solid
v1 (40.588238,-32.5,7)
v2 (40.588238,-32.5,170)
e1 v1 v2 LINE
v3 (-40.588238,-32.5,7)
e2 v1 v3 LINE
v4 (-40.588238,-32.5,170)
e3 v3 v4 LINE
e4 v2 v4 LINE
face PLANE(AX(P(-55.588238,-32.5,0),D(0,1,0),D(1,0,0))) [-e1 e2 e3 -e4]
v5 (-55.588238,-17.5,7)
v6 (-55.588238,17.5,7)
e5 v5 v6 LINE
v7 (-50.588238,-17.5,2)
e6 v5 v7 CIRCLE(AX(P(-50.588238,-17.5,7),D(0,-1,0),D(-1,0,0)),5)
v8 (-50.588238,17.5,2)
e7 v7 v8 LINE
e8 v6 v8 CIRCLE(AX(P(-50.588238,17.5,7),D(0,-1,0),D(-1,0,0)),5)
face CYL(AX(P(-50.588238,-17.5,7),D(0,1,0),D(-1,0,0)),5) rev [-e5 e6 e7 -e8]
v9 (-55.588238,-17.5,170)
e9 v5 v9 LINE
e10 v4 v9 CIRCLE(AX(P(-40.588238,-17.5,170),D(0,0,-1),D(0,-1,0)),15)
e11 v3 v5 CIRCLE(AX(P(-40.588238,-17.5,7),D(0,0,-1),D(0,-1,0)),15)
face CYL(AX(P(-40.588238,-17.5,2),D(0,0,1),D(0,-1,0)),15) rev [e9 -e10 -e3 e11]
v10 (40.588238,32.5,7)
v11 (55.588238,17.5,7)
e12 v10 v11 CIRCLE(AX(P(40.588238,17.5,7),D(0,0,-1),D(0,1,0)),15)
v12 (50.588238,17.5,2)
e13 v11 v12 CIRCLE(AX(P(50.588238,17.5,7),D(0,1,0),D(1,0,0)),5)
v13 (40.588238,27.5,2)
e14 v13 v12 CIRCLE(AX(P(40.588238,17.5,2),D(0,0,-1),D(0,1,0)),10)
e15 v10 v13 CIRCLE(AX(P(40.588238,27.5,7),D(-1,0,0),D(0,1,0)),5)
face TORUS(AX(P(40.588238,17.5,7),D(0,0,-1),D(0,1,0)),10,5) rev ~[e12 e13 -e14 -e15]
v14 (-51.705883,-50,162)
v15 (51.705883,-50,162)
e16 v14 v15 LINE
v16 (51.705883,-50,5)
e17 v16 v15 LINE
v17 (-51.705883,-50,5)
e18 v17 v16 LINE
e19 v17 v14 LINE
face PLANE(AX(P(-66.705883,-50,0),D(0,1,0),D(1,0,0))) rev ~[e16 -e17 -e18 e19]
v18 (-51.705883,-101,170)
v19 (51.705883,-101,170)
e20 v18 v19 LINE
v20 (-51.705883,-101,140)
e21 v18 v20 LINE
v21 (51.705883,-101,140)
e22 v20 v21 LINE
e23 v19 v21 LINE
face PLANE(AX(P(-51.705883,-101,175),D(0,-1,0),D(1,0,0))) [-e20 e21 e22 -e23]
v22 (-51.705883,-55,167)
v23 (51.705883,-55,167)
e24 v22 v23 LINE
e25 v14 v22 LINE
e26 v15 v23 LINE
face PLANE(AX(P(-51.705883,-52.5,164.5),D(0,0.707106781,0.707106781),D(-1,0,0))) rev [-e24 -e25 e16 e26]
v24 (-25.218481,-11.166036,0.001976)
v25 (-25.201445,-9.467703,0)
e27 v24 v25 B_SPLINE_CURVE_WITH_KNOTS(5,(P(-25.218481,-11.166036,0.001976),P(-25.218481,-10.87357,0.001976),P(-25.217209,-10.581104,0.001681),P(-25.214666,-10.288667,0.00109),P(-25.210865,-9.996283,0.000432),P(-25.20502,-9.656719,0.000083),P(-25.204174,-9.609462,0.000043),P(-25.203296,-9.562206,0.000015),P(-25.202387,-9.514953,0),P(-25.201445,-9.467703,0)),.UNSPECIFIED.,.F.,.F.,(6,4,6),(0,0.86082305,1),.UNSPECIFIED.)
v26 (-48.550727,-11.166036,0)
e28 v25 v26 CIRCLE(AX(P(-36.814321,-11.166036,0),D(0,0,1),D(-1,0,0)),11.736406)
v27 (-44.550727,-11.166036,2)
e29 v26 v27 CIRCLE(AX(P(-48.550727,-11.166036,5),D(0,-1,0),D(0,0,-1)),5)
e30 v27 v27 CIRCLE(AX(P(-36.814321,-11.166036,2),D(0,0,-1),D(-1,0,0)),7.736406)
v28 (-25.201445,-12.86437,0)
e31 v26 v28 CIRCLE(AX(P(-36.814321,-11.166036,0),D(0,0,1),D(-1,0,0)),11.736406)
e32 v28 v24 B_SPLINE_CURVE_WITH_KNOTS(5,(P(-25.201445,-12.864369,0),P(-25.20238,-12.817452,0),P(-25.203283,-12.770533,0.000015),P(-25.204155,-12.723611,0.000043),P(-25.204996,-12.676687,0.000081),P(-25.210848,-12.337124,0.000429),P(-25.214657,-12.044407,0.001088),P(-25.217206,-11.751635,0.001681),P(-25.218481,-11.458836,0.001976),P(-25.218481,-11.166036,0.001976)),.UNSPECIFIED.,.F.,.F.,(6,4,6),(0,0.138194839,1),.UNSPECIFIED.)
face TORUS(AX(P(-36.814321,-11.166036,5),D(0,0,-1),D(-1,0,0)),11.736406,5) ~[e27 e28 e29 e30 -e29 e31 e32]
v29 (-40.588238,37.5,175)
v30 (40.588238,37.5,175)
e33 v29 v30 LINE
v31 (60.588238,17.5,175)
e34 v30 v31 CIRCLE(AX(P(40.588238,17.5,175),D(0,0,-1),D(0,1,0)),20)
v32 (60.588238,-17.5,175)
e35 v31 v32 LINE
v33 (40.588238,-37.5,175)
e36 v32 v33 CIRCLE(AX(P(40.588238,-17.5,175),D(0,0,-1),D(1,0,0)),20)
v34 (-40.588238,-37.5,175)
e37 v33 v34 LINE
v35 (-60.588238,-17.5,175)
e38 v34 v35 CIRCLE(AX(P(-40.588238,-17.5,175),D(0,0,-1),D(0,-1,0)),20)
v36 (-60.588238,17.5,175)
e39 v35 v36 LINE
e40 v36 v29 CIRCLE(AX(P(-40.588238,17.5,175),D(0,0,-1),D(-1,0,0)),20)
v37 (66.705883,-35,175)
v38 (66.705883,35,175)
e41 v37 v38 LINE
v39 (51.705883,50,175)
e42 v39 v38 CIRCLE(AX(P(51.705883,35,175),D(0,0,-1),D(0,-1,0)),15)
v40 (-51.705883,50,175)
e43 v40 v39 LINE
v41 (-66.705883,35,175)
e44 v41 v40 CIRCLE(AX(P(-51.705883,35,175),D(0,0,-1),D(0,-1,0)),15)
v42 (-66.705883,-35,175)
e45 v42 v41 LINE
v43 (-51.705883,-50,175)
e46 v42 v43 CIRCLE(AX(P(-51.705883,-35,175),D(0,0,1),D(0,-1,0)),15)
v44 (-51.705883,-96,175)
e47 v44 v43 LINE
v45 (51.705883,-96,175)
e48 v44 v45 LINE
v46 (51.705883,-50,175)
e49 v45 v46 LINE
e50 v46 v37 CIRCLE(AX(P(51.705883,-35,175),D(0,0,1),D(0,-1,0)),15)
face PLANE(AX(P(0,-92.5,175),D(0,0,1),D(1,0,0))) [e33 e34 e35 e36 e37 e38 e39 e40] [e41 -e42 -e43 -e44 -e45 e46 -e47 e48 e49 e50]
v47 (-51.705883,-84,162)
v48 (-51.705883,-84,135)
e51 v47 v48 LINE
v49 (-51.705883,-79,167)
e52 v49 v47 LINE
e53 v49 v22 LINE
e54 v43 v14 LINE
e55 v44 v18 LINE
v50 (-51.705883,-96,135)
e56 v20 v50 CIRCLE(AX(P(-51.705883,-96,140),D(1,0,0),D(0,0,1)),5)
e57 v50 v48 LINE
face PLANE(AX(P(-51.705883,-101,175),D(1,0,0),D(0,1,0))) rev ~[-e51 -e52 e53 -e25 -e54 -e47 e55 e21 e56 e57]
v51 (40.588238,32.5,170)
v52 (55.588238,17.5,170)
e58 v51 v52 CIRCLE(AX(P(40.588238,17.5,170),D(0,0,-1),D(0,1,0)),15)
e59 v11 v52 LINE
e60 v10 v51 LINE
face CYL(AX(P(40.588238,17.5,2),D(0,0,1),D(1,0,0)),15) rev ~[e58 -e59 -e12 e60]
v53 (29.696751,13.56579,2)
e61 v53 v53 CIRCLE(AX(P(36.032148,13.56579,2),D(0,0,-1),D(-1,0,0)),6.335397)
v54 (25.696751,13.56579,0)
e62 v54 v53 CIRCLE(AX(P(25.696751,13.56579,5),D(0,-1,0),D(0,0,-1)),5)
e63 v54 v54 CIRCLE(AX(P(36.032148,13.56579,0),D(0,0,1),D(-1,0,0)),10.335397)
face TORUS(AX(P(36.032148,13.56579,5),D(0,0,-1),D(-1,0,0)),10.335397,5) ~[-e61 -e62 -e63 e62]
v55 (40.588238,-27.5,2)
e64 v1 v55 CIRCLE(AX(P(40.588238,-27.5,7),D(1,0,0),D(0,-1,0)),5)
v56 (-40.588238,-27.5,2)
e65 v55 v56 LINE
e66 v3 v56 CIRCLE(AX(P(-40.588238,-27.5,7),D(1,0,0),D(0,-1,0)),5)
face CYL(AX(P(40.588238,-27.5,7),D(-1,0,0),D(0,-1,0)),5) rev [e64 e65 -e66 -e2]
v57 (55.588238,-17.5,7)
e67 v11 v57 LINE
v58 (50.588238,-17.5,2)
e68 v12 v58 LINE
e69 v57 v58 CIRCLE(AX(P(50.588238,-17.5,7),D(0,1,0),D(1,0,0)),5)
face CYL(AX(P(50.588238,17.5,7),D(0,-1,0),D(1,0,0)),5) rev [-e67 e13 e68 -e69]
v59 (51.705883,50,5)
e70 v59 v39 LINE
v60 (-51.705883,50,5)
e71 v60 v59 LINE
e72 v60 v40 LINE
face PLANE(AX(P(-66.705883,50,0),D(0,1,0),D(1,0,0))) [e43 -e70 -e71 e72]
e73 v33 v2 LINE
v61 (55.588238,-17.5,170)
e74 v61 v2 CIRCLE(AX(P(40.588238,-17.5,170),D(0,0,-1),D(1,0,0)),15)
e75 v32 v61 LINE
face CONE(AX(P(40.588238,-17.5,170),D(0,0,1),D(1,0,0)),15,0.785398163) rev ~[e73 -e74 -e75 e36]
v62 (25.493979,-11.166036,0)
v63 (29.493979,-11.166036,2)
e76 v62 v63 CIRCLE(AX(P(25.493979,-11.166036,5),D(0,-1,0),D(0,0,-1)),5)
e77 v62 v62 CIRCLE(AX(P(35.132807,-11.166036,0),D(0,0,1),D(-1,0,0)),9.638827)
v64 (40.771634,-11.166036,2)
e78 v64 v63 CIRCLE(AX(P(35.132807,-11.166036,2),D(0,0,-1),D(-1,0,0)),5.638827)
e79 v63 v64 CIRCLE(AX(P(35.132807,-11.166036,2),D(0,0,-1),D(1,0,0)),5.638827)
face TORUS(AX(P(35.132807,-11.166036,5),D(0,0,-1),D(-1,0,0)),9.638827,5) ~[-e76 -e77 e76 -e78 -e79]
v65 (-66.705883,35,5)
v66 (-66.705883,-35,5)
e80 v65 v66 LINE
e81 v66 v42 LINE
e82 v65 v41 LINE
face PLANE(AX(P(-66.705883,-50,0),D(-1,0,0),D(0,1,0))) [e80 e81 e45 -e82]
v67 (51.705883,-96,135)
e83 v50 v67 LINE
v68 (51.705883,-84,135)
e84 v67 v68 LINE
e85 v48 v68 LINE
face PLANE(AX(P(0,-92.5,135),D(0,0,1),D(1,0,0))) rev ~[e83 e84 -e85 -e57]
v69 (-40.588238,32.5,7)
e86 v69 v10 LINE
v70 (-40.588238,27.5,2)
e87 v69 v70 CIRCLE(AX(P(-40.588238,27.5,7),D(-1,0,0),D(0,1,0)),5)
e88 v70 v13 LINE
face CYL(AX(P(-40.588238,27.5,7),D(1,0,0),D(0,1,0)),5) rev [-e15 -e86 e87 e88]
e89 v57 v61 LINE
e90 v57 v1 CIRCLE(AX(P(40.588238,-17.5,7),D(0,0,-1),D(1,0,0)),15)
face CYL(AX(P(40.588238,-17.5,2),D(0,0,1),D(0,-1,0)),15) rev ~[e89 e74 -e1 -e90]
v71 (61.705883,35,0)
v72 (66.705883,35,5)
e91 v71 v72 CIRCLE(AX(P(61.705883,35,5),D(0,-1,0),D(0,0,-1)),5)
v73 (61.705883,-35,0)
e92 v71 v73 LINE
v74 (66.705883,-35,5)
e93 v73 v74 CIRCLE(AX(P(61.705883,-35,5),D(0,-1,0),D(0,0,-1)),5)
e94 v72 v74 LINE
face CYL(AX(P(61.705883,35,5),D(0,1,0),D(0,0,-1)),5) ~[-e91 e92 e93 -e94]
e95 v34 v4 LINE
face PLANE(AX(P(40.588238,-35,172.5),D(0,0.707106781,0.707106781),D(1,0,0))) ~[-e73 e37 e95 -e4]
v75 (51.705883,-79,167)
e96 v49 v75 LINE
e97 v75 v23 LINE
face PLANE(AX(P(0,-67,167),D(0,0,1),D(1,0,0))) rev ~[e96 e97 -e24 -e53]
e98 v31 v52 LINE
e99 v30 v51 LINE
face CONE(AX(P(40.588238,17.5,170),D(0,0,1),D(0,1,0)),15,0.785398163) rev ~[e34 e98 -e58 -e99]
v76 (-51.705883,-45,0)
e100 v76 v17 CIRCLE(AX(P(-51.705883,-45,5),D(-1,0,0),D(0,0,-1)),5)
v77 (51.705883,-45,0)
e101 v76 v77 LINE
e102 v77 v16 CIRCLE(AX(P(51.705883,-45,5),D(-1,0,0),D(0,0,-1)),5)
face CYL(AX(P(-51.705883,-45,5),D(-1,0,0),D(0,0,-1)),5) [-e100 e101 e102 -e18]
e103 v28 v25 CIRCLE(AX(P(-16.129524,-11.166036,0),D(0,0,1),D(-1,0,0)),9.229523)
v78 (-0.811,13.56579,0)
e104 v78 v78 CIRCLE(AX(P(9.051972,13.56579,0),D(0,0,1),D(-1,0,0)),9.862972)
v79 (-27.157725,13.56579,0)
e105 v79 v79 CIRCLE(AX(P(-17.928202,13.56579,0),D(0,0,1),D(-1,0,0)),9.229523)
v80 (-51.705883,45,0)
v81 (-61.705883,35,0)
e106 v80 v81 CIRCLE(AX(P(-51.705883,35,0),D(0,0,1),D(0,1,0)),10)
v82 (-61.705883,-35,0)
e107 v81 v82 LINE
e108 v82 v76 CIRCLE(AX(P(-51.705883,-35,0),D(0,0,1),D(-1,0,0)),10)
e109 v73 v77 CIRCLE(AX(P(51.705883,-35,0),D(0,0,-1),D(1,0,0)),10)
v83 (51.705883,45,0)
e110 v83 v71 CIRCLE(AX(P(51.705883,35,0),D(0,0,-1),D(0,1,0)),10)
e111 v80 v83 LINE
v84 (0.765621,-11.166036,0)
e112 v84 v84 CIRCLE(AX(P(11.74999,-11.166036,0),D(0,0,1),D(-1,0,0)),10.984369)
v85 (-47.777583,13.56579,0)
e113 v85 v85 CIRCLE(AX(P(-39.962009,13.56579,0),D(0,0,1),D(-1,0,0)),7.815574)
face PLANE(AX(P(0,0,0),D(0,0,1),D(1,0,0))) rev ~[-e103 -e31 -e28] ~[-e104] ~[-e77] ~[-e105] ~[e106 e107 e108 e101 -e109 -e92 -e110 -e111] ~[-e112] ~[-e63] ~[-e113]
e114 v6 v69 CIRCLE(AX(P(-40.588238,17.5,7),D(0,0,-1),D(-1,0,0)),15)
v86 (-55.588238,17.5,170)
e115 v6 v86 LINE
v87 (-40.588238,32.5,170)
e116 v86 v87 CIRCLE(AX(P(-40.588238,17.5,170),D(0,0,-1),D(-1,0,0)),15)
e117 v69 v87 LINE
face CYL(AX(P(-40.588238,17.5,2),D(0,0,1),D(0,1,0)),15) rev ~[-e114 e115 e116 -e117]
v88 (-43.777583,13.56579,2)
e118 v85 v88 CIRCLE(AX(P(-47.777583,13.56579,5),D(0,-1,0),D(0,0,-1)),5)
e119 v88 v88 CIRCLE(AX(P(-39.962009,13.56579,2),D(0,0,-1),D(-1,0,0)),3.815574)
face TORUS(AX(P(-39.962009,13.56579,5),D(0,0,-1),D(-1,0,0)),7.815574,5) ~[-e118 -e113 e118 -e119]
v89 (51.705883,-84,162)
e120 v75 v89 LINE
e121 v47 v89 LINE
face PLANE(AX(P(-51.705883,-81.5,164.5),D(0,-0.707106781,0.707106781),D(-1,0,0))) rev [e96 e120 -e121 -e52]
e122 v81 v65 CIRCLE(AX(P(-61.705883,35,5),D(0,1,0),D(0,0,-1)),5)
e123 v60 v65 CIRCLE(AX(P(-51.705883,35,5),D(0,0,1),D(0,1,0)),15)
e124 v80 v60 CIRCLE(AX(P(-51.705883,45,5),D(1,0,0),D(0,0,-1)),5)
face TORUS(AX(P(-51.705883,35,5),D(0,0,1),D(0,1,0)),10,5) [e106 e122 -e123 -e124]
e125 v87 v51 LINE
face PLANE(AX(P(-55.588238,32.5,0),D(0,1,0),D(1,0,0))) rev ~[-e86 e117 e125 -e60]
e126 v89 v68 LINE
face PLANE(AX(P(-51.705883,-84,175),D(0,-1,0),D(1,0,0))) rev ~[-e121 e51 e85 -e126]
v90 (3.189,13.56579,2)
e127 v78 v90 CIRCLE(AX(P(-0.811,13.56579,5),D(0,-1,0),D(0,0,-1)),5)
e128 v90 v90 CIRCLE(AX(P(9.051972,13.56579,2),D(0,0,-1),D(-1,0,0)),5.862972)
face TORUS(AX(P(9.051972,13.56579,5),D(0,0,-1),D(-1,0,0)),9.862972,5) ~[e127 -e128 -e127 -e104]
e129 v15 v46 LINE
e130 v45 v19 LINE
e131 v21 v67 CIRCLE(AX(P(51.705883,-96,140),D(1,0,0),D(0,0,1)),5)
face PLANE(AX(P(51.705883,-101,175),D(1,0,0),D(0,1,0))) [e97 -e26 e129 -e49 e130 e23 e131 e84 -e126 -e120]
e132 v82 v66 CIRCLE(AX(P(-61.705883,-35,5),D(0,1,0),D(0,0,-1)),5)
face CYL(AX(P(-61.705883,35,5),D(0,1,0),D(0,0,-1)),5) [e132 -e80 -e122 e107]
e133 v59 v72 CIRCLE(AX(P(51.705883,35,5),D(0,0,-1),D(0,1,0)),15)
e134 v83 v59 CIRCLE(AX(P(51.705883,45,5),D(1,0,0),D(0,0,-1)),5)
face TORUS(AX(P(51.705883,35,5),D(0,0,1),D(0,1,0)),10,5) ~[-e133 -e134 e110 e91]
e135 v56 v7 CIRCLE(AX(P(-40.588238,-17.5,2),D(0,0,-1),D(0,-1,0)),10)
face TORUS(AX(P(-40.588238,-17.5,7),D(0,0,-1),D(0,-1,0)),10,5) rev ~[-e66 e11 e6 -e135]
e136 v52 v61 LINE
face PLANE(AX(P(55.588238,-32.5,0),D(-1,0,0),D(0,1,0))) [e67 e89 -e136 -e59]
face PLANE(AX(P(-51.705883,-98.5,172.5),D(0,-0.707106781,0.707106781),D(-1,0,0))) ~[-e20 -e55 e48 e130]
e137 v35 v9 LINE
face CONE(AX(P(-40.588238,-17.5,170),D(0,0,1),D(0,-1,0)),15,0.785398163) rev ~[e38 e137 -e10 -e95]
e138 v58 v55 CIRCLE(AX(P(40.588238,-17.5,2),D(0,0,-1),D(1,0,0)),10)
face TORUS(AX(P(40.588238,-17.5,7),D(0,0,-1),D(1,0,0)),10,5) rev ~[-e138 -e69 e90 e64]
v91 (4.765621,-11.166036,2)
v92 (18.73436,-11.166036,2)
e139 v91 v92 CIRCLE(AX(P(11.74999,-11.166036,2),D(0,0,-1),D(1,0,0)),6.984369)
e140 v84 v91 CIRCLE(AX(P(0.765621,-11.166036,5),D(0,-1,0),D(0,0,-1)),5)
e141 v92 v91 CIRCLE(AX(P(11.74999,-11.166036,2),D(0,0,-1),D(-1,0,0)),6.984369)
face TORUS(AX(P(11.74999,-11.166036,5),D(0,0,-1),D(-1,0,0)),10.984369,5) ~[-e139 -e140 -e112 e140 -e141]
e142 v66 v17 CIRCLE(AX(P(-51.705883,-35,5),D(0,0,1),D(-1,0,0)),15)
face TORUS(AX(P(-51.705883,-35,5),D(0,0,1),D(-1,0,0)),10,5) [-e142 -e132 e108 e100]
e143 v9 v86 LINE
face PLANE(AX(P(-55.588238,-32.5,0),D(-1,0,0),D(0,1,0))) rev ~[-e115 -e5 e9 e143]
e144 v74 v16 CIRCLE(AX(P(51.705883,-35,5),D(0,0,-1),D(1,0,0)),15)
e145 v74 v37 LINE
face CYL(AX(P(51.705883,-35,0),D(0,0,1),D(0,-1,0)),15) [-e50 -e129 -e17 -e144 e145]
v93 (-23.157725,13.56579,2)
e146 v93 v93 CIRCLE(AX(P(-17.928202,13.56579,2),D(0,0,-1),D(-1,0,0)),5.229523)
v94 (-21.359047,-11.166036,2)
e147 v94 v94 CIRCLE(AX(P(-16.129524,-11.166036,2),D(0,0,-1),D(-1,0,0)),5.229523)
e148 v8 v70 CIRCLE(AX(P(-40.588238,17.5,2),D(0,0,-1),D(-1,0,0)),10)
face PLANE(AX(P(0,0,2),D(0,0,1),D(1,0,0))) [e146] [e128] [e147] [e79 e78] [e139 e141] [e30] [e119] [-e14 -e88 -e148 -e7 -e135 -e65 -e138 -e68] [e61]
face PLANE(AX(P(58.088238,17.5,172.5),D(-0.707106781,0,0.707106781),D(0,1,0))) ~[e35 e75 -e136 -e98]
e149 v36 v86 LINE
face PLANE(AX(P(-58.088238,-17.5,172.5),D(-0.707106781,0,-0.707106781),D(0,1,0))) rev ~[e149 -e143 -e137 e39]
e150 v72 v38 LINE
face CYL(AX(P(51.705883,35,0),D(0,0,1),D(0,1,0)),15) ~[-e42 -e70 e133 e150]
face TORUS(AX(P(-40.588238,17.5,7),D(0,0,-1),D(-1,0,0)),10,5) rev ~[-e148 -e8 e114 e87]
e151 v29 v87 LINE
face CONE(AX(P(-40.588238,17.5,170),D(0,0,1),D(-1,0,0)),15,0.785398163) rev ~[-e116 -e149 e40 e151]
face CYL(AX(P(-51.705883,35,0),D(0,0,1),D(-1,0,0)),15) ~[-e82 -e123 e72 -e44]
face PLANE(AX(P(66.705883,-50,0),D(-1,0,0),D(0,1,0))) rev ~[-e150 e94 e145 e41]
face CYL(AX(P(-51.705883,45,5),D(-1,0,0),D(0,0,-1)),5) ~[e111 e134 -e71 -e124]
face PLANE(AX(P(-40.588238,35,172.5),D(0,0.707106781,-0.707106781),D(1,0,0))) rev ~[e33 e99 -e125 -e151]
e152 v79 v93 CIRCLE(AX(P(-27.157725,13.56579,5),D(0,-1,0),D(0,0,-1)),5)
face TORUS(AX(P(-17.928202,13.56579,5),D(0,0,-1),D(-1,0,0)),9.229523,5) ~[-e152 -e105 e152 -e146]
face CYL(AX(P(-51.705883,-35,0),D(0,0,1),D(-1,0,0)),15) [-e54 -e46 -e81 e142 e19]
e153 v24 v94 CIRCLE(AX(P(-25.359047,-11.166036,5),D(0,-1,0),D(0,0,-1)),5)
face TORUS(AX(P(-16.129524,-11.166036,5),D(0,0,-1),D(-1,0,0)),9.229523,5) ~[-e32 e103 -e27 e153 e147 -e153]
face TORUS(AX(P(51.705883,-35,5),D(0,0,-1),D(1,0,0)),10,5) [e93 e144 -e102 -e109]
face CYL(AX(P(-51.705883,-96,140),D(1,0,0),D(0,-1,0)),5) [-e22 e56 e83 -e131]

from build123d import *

# Parameters (mm, degrees)
F0_W          = 133.4117650986
F0_H          = 100
F0_W_2        = 111.1764758825
F0_H_2        = 65
F1_DEPTH      = 175
F2_DEPTH      = 2
F3_R          = 15
F4_W          = 103.4117650986
F4_H          = 34
F5_DEPTH      = 8
F4_H_2        = 17
F6_DEPTH      = 40
F7_SIZE       = 5
F8_SIZE       = 5
F9_R          = 5
F10_R         = 5
F12_DEPTH     = 25
F13_T1_DEPTH  = 103.4117650986
F13_T3_DEPTH  = 70
F13_T6_ANGLE  = 90
F13_T8_ANGLE  = 90
F13_T10_ANGLE = 90
F13_T12_ANGLE = 90


# Not quite as in the source:
# - a fillet or chamfer that OpenCascade refuses, or shapes differently, is made with other operations: its cross-section is extruded or revolved along the edge and cut away or added


with BuildPart() as f1:
    # F0 (on Top) → F1 (new body)
    with BuildSketch(Plane.XY):
        Rectangle(F0_W, F0_H)
        Rectangle(F0_W_2, F0_H_2, mode=Mode.SUBTRACT)
    extrude(amount=F1_DEPTH)

    # F0 (on Top) → F2 (join)
    with BuildSketch(Plane.XY):
        Rectangle(F0_W_2, F0_H_2)
    extrude(amount=F2_DEPTH)

    # F3
    f3_edges = [f1.edges().sort_by_distance(p)[0] for p in [
        (66.705883, -50, 87.5),
        (66.705883, 50, 87.5),
        (-66.705883, -50, 87.5),
        (-66.705883, 50, 87.5),
        (55.588238, -32.5, 88.5),
        (-55.588238, -32.5, 88.5),
        (-55.588238, 32.5, 88.5),
        (55.588238, 32.5, 88.5),
    ]]
    fillet(f3_edges, radius=F3_R)

    # F4 (on face) → F5 (join)
    with BuildSketch(Plane.XY.offset(175)):
        with Locations((0, -67)):
            Rectangle(F4_W, F4_H)
    extrude(amount=-F5_DEPTH)

    # F4 (on face) → F6 (join)
    with BuildSketch(Plane.XY.offset(175)):
        with Locations((0, -92.5)):
            Rectangle(F4_W, F4_H_2)
    extrude(amount=-F6_DEPTH)

    # F7
    f7_edges = [f1.edges().sort_by_distance(p)[0] for p in [
        (0, -101, 175),
        (0, -84, 167),
        (0, -50, 167),
    ]]
    chamfer(f7_edges, length=F7_SIZE)

    # F8
    f8_edges = [f1.edges().sort_by_distance(p)[0] for p in [
        (-51.19484, -28.106602, 175),
        (-55.588238, 0, 175),
        (-51.19484, 28.106602, 175),
        (0, 32.5, 175),
        (51.19484, 28.106602, 175),
        (55.588238, 0, 175),
        (51.19484, -28.106602, 175),
        (0, -32.5, 175),
    ]]
    chamfer(f8_edges, length=F8_SIZE)

    # F9
    f9_edges = [f1.edges().sort_by_distance(p)[0] for p in [
        (0, 32.5, 2),
        (51.19484, 28.106602, 2),
        (-51.19484, 28.106602, 2),
        (55.588238, 0, 2),
        (-55.588238, 0, 2),
        (51.19484, -28.106602, 2),
        (-51.19484, -28.106602, 2),
        (0, -32.5, 2),
    ]]
    fillet(f9_edges, radius=F9_R)

    # F10
    f10_edges = [f1.edges().sort_by_distance(p)[0] for p in [
        (0, -101, 135),
    ]]
    fillet(f10_edges, radius=F10_R)

    # F11 (on Top) → F12 (cut)
    with BuildSketch(Plane.XY):
        with BuildLine():
            Line((4.7656208593, -11.166036129), (18.7343597096, -11.166036129))
            ThreePointArc((18.7343597096, -11.166036129), (11.7499902844, -4.1816667038), (4.7656208593, -11.166036129))
        make_face()
        with BuildLine():
            ThreePointArc((4.7656208593, -11.166036129), (11.7499902844, -18.1504055542), (18.7343597096, -11.166036129))
            Line((18.7343597096, -11.166036129), (4.7656208593, -11.166036129))
        make_face()
        with BuildLine():
            ThreePointArc((14.9149444799, 13.5657899082), (9.0519720688, 19.4287623192), (3.1889996578, 13.5657899082))
            Line((3.1889996578, 13.5657899082), (14.9149444799, 13.5657899082))
        make_face()
        with BuildLine():
            Line((14.9149444799, 13.5657899082), (3.1889996578, 13.5657899082))
            ThreePointArc((3.1889996578, 13.5657899082), (9.0519720688, 7.7028174971), (14.9149444799, 13.5657899082))
        make_face()
        with BuildLine():
            ThreePointArc((42.3675444587, 13.5657899082), (36.0321477056, 19.9011866613), (29.6967509524, 13.5657899082))
            Line((29.6967509524, 13.5657899082), (42.3675444587, 13.5657899082))
        make_face()
        with BuildLine():
            Line((42.3675444587, 13.5657899082), (29.6967509524, 13.5657899082))
            ThreePointArc((29.6967509524, 13.5657899082), (36.0321477056, 7.230393155), (42.3675444587, 13.5657899082))
        make_face()
        with BuildLine():
            Line((29.4939792554, -11.166036129), (40.7716342409, -11.166036129))
            ThreePointArc((40.7716342409, -11.166036129), (35.1328067482, -5.5272086363), (29.4939792554, -11.166036129))
        make_face()
        with BuildLine():
            ThreePointArc((29.4939792554, -11.166036129), (35.1328067482, -16.8048636217), (40.7716342409, -11.166036129))
            Line((40.7716342409, -11.166036129), (29.4939792554, -11.166036129))
        make_face()
        with BuildLine():
            Line((-44.5507267353, -11.166036129), (-29.0779149297, -11.166036129))
            ThreePointArc((-29.0779149297, -11.166036129), (-36.8143208325, -3.4296302262), (-44.5507267353, -11.166036129))
        make_face()
        with BuildLine():
            ThreePointArc((-44.5507267353, -11.166036129), (-36.8143208325, -18.9024420318), (-29.0779149297, -11.166036129))
            Line((-29.0779149297, -11.166036129), (-44.5507267353, -11.166036129))
        make_face()
        with BuildLine():
            Line((-21.3590465179, -11.166036129), (-10.9000005135, -11.166036129))
            ThreePointArc((-10.9000005135, -11.166036129), (-16.1295235157, -5.9365131268), (-21.3590465179, -11.166036129))
        make_face()
        with BuildLine():
            ThreePointArc((-21.3590465179, -11.166036129), (-16.1295235157, -16.3955591312), (-10.9000005135, -11.166036129))
            Line((-10.9000005135, -11.166036129), (-21.3590465179, -11.166036129))
        make_face()
        with BuildLine():
            ThreePointArc((-12.6986786843, 13.5657899082), (-17.9282017052, 18.7953129291), (-23.1577247262, 13.5657899082))
            Line((-23.1577247262, 13.5657899082), (-12.6986786843, 13.5657899082))
        make_face()
        with BuildLine():
            Line((-12.6986786843, 13.5657899082), (-23.1577247262, 13.5657899082))
            ThreePointArc((-23.1577247262, 13.5657899082), (-17.9282017052, 8.3362668872), (-12.6986786843, 13.5657899082))
        make_face()
        with BuildLine():
            Line((-43.7775825475, 13.5657899082), (-36.1464346434, 13.5657899082))
            ThreePointArc((-36.1464346434, 13.5657899082), (-39.9620085955, 17.3813638602), (-43.7775825475, 13.5657899082))
        make_face()
        with BuildLine():
            ThreePointArc((-43.7775825475, 13.5657899082), (-39.9620085955, 9.7502159561), (-36.1464346434, 13.5657899082))
            Line((-36.1464346434, 13.5657899082), (-43.7775825475, 13.5657899082))
        make_face()
    extrude(amount=F12_DEPTH, mode=Mode.SUBTRACT)

    # F13: fillet of radius 5 on 16 edges, made by hand

    # F13_s2 → F13_t1 (cut)
    with BuildSketch(Plane.YZ.offset(-51.7058825493)):
        with BuildLine():
            ThreePointArc((45, 0), (48.5355339059, 1.4644660941), (50, 5))
            Line((50, 5), (50, 0))
            Line((50, 0), (45, 0))
        make_face()
        with BuildLine():
            ThreePointArc((-45, 0), (-48.5355339059, 1.4644660941), (-50, 5))
            Line((-50, 5), (-50, 0))
            Line((-50, 0), (-45, 0))
        make_face()
    extrude(amount=F13_T1_DEPTH, mode=Mode.SUBTRACT)

    # F13_s4 → F13_t3 (cut)
    with BuildSketch(Plane.XZ.offset(-35)):
        with BuildLine():
            ThreePointArc((61.7058825493, 0), (65.2414164552, 1.4644660941), (66.7058825493, 5))
            Line((66.7058825493, 5), (66.7058825493, 0))
            Line((66.7058825493, 0), (61.7058825493, 0))
        make_face()
        with BuildLine():
            ThreePointArc((-61.7058825493, 0), (-65.2414164552, 1.4644660941), (-66.7058825493, 5))
            Line((-66.7058825493, 5), (-66.7058825493, 0))
            Line((-66.7058825493, 0), (-61.7058825493, 0))
        make_face()
    extrude(amount=F13_T3_DEPTH, mode=Mode.SUBTRACT)

    # F13_s5 → F13_t6 (revolve, cut)
    with BuildSketch(Plane.YZ.offset(51.7058825493)):
        with BuildLine():
            ThreePointArc((45, 0), (48.5355339059, 1.4644660941), (50, 5))
            Line((50, 5), (50, 0))
            Line((50, 0), (45, 0))
        make_face()
    revolve(axis=Axis((51.7058825493, 35, 0), (0, 0, -1)), revolution_arc=F13_T6_ANGLE, mode=Mode.SUBTRACT)

    # F13_s7 → F13_t8 (revolve, cut)
    with BuildSketch(Plane.YZ.offset(-51.7058825493)):
        with BuildLine():
            ThreePointArc((45, 0), (48.5355339059, 1.4644660941), (50, 5))
            Line((50, 5), (50, 0))
            Line((50, 0), (45, 0))
        make_face()
    revolve(axis=Axis((-51.7058825493, 35, 0), (0, 0, 1)), revolution_arc=F13_T8_ANGLE, mode=Mode.SUBTRACT)

    # F13_s9 → F13_t10 (revolve, cut)
    with BuildSketch(Plane.XZ.offset(35)):
        with BuildLine():
            ThreePointArc((66.7058825493, 5), (65.2414164552, 1.4644660941), (61.7058825493, 0))
            Line((61.7058825493, 0), (66.7058825493, 0))
            Line((66.7058825493, 0), (66.7058825493, 5))
        make_face()
    revolve(axis=Axis((51.7058825493, -35, 0), (0, 0, -1)), revolution_arc=F13_T10_ANGLE, mode=Mode.SUBTRACT)

    # F13_s11 → F13_t12 (revolve, cut)
    with BuildSketch(Plane.XZ.offset(35)):
        with BuildLine():
            ThreePointArc((-61.7058825493, 0), (-65.2414164552, 1.4644660941), (-66.7058825493, 5))
            Line((-66.7058825493, 5), (-66.7058825493, 0))
            Line((-66.7058825493, 0), (-61.7058825493, 0))
        make_face()
    revolve(axis=Axis((-51.7058825493, -35, 0), (0, 0, 1)), revolution_arc=F13_T12_ANGLE, mode=Mode.SUBTRACT)

    # F13_s13 → F13_t14 (revolve, cut)
    with BuildSketch(Plane.XZ.offset(11.166036129)):
        with BuildLine():
            ThreePointArc((-48.5507267353, 0), (-46.3146587578, 0.527864045), (-44.5507267353, 2))
            Line((-44.5507267353, 2), (-44.5507267353, 0))
            Line((-44.5507267353, 0), (-48.5507267353, 0))
        make_face()
    revolve(axis=Axis((-36.8143208325, -11.166036129, 0), (0, 0, 1)), mode=Mode.SUBTRACT)

    # F13_s15 → F13_t16 (revolve, cut)
    with BuildSketch(Plane.XZ.offset(11.166036129)):
        with BuildLine():
            ThreePointArc((-25.3590465179, 0), (-23.1229785404, 0.527864045), (-21.3590465179, 2))
            Line((-21.3590465179, 2), (-21.3590465179, 0))
            Line((-21.3590465179, 0), (-25.3590465179, 0))
        make_face()
    revolve(axis=Axis((-16.1295235157, -11.166036129, 0), (0, 0, 1)), mode=Mode.SUBTRACT)

    # F13_s17 → F13_t18 (revolve, cut)
    with BuildSketch(Plane.XZ.offset(11.166036129)):
        with BuildLine():
            ThreePointArc((0.7656208593, 0), (3.0016888368, 0.527864045), (4.7656208593, 2))
            Line((4.7656208593, 2), (4.7656208593, 0))
            Line((4.7656208593, 0), (0.7656208593, 0))
        make_face()
    revolve(axis=Axis((11.7499902844, -11.166036129, 0), (0, 0, 1)), mode=Mode.SUBTRACT)

    # F13_s19 → F13_t20 (revolve, cut)
    with BuildSketch(Plane.XZ.offset(11.166036129)):
        with BuildLine():
            ThreePointArc((25.4939792554, 0), (27.7300472329, 0.527864045), (29.4939792554, 2))
            Line((29.4939792554, 2), (29.4939792554, 0))
            Line((29.4939792554, 0), (25.4939792554, 0))
        make_face()
    revolve(axis=Axis((35.1328067482, -11.166036129, 0), (0, 0, 1)), mode=Mode.SUBTRACT)

    # F13_s21 → F13_t22 (revolve, cut)
    with BuildSketch(Plane.XZ.offset(-13.5657899082)):
        with BuildLine():
            ThreePointArc((-47.7775825475, 0), (-45.54151457, 0.527864045), (-43.7775825475, 2))
            Line((-43.7775825475, 2), (-43.7775825475, 0))
            Line((-43.7775825475, 0), (-47.7775825475, 0))
        make_face()
    revolve(axis=Axis((-39.9620085955, 13.5657899082, 0), (0, 0, 1)), mode=Mode.SUBTRACT)

    # F13_s23 → F13_t24 (revolve, cut)
    with BuildSketch(Plane.XZ.offset(-13.5657899082)):
        with BuildLine():
            ThreePointArc((-27.1577247262, 0), (-24.9216567487, 0.527864045), (-23.1577247262, 2))
            Line((-23.1577247262, 2), (-23.1577247262, 0))
            Line((-23.1577247262, 0), (-27.1577247262, 0))
        make_face()
    revolve(axis=Axis((-17.9282017052, 13.5657899082, 0), (0, 0, 1)), mode=Mode.SUBTRACT)

    # F13_s25 → F13_t26 (revolve, cut)
    with BuildSketch(Plane.XZ.offset(-13.5657899082)):
        with BuildLine():
            ThreePointArc((-0.8110003422, 0), (1.4250676353, 0.527864045), (3.1889996578, 2))
            Line((3.1889996578, 2), (3.1889996578, 0))
            Line((3.1889996578, 0), (-0.8110003422, 0))
        make_face()
    revolve(axis=Axis((9.0519720688, 13.5657899082, 0), (0, 0, 1)), mode=Mode.SUBTRACT)

    # F13_s27 → F13_t28 (revolve, cut)
    with BuildSketch(Plane.XZ.offset(-13.5657899082)):
        with BuildLine():
            ThreePointArc((25.6967509524, 0), (27.9328189299, 0.527864045), (29.6967509524, 2))
            Line((29.6967509524, 2), (29.6967509524, 0))
            Line((29.6967509524, 0), (25.6967509524, 0))
        make_face()
    revolve(axis=Axis((36.0321477056, 13.5657899082, 0), (0, 0, 1)), mode=Mode.SUBTRACT)


solid = f1.part
